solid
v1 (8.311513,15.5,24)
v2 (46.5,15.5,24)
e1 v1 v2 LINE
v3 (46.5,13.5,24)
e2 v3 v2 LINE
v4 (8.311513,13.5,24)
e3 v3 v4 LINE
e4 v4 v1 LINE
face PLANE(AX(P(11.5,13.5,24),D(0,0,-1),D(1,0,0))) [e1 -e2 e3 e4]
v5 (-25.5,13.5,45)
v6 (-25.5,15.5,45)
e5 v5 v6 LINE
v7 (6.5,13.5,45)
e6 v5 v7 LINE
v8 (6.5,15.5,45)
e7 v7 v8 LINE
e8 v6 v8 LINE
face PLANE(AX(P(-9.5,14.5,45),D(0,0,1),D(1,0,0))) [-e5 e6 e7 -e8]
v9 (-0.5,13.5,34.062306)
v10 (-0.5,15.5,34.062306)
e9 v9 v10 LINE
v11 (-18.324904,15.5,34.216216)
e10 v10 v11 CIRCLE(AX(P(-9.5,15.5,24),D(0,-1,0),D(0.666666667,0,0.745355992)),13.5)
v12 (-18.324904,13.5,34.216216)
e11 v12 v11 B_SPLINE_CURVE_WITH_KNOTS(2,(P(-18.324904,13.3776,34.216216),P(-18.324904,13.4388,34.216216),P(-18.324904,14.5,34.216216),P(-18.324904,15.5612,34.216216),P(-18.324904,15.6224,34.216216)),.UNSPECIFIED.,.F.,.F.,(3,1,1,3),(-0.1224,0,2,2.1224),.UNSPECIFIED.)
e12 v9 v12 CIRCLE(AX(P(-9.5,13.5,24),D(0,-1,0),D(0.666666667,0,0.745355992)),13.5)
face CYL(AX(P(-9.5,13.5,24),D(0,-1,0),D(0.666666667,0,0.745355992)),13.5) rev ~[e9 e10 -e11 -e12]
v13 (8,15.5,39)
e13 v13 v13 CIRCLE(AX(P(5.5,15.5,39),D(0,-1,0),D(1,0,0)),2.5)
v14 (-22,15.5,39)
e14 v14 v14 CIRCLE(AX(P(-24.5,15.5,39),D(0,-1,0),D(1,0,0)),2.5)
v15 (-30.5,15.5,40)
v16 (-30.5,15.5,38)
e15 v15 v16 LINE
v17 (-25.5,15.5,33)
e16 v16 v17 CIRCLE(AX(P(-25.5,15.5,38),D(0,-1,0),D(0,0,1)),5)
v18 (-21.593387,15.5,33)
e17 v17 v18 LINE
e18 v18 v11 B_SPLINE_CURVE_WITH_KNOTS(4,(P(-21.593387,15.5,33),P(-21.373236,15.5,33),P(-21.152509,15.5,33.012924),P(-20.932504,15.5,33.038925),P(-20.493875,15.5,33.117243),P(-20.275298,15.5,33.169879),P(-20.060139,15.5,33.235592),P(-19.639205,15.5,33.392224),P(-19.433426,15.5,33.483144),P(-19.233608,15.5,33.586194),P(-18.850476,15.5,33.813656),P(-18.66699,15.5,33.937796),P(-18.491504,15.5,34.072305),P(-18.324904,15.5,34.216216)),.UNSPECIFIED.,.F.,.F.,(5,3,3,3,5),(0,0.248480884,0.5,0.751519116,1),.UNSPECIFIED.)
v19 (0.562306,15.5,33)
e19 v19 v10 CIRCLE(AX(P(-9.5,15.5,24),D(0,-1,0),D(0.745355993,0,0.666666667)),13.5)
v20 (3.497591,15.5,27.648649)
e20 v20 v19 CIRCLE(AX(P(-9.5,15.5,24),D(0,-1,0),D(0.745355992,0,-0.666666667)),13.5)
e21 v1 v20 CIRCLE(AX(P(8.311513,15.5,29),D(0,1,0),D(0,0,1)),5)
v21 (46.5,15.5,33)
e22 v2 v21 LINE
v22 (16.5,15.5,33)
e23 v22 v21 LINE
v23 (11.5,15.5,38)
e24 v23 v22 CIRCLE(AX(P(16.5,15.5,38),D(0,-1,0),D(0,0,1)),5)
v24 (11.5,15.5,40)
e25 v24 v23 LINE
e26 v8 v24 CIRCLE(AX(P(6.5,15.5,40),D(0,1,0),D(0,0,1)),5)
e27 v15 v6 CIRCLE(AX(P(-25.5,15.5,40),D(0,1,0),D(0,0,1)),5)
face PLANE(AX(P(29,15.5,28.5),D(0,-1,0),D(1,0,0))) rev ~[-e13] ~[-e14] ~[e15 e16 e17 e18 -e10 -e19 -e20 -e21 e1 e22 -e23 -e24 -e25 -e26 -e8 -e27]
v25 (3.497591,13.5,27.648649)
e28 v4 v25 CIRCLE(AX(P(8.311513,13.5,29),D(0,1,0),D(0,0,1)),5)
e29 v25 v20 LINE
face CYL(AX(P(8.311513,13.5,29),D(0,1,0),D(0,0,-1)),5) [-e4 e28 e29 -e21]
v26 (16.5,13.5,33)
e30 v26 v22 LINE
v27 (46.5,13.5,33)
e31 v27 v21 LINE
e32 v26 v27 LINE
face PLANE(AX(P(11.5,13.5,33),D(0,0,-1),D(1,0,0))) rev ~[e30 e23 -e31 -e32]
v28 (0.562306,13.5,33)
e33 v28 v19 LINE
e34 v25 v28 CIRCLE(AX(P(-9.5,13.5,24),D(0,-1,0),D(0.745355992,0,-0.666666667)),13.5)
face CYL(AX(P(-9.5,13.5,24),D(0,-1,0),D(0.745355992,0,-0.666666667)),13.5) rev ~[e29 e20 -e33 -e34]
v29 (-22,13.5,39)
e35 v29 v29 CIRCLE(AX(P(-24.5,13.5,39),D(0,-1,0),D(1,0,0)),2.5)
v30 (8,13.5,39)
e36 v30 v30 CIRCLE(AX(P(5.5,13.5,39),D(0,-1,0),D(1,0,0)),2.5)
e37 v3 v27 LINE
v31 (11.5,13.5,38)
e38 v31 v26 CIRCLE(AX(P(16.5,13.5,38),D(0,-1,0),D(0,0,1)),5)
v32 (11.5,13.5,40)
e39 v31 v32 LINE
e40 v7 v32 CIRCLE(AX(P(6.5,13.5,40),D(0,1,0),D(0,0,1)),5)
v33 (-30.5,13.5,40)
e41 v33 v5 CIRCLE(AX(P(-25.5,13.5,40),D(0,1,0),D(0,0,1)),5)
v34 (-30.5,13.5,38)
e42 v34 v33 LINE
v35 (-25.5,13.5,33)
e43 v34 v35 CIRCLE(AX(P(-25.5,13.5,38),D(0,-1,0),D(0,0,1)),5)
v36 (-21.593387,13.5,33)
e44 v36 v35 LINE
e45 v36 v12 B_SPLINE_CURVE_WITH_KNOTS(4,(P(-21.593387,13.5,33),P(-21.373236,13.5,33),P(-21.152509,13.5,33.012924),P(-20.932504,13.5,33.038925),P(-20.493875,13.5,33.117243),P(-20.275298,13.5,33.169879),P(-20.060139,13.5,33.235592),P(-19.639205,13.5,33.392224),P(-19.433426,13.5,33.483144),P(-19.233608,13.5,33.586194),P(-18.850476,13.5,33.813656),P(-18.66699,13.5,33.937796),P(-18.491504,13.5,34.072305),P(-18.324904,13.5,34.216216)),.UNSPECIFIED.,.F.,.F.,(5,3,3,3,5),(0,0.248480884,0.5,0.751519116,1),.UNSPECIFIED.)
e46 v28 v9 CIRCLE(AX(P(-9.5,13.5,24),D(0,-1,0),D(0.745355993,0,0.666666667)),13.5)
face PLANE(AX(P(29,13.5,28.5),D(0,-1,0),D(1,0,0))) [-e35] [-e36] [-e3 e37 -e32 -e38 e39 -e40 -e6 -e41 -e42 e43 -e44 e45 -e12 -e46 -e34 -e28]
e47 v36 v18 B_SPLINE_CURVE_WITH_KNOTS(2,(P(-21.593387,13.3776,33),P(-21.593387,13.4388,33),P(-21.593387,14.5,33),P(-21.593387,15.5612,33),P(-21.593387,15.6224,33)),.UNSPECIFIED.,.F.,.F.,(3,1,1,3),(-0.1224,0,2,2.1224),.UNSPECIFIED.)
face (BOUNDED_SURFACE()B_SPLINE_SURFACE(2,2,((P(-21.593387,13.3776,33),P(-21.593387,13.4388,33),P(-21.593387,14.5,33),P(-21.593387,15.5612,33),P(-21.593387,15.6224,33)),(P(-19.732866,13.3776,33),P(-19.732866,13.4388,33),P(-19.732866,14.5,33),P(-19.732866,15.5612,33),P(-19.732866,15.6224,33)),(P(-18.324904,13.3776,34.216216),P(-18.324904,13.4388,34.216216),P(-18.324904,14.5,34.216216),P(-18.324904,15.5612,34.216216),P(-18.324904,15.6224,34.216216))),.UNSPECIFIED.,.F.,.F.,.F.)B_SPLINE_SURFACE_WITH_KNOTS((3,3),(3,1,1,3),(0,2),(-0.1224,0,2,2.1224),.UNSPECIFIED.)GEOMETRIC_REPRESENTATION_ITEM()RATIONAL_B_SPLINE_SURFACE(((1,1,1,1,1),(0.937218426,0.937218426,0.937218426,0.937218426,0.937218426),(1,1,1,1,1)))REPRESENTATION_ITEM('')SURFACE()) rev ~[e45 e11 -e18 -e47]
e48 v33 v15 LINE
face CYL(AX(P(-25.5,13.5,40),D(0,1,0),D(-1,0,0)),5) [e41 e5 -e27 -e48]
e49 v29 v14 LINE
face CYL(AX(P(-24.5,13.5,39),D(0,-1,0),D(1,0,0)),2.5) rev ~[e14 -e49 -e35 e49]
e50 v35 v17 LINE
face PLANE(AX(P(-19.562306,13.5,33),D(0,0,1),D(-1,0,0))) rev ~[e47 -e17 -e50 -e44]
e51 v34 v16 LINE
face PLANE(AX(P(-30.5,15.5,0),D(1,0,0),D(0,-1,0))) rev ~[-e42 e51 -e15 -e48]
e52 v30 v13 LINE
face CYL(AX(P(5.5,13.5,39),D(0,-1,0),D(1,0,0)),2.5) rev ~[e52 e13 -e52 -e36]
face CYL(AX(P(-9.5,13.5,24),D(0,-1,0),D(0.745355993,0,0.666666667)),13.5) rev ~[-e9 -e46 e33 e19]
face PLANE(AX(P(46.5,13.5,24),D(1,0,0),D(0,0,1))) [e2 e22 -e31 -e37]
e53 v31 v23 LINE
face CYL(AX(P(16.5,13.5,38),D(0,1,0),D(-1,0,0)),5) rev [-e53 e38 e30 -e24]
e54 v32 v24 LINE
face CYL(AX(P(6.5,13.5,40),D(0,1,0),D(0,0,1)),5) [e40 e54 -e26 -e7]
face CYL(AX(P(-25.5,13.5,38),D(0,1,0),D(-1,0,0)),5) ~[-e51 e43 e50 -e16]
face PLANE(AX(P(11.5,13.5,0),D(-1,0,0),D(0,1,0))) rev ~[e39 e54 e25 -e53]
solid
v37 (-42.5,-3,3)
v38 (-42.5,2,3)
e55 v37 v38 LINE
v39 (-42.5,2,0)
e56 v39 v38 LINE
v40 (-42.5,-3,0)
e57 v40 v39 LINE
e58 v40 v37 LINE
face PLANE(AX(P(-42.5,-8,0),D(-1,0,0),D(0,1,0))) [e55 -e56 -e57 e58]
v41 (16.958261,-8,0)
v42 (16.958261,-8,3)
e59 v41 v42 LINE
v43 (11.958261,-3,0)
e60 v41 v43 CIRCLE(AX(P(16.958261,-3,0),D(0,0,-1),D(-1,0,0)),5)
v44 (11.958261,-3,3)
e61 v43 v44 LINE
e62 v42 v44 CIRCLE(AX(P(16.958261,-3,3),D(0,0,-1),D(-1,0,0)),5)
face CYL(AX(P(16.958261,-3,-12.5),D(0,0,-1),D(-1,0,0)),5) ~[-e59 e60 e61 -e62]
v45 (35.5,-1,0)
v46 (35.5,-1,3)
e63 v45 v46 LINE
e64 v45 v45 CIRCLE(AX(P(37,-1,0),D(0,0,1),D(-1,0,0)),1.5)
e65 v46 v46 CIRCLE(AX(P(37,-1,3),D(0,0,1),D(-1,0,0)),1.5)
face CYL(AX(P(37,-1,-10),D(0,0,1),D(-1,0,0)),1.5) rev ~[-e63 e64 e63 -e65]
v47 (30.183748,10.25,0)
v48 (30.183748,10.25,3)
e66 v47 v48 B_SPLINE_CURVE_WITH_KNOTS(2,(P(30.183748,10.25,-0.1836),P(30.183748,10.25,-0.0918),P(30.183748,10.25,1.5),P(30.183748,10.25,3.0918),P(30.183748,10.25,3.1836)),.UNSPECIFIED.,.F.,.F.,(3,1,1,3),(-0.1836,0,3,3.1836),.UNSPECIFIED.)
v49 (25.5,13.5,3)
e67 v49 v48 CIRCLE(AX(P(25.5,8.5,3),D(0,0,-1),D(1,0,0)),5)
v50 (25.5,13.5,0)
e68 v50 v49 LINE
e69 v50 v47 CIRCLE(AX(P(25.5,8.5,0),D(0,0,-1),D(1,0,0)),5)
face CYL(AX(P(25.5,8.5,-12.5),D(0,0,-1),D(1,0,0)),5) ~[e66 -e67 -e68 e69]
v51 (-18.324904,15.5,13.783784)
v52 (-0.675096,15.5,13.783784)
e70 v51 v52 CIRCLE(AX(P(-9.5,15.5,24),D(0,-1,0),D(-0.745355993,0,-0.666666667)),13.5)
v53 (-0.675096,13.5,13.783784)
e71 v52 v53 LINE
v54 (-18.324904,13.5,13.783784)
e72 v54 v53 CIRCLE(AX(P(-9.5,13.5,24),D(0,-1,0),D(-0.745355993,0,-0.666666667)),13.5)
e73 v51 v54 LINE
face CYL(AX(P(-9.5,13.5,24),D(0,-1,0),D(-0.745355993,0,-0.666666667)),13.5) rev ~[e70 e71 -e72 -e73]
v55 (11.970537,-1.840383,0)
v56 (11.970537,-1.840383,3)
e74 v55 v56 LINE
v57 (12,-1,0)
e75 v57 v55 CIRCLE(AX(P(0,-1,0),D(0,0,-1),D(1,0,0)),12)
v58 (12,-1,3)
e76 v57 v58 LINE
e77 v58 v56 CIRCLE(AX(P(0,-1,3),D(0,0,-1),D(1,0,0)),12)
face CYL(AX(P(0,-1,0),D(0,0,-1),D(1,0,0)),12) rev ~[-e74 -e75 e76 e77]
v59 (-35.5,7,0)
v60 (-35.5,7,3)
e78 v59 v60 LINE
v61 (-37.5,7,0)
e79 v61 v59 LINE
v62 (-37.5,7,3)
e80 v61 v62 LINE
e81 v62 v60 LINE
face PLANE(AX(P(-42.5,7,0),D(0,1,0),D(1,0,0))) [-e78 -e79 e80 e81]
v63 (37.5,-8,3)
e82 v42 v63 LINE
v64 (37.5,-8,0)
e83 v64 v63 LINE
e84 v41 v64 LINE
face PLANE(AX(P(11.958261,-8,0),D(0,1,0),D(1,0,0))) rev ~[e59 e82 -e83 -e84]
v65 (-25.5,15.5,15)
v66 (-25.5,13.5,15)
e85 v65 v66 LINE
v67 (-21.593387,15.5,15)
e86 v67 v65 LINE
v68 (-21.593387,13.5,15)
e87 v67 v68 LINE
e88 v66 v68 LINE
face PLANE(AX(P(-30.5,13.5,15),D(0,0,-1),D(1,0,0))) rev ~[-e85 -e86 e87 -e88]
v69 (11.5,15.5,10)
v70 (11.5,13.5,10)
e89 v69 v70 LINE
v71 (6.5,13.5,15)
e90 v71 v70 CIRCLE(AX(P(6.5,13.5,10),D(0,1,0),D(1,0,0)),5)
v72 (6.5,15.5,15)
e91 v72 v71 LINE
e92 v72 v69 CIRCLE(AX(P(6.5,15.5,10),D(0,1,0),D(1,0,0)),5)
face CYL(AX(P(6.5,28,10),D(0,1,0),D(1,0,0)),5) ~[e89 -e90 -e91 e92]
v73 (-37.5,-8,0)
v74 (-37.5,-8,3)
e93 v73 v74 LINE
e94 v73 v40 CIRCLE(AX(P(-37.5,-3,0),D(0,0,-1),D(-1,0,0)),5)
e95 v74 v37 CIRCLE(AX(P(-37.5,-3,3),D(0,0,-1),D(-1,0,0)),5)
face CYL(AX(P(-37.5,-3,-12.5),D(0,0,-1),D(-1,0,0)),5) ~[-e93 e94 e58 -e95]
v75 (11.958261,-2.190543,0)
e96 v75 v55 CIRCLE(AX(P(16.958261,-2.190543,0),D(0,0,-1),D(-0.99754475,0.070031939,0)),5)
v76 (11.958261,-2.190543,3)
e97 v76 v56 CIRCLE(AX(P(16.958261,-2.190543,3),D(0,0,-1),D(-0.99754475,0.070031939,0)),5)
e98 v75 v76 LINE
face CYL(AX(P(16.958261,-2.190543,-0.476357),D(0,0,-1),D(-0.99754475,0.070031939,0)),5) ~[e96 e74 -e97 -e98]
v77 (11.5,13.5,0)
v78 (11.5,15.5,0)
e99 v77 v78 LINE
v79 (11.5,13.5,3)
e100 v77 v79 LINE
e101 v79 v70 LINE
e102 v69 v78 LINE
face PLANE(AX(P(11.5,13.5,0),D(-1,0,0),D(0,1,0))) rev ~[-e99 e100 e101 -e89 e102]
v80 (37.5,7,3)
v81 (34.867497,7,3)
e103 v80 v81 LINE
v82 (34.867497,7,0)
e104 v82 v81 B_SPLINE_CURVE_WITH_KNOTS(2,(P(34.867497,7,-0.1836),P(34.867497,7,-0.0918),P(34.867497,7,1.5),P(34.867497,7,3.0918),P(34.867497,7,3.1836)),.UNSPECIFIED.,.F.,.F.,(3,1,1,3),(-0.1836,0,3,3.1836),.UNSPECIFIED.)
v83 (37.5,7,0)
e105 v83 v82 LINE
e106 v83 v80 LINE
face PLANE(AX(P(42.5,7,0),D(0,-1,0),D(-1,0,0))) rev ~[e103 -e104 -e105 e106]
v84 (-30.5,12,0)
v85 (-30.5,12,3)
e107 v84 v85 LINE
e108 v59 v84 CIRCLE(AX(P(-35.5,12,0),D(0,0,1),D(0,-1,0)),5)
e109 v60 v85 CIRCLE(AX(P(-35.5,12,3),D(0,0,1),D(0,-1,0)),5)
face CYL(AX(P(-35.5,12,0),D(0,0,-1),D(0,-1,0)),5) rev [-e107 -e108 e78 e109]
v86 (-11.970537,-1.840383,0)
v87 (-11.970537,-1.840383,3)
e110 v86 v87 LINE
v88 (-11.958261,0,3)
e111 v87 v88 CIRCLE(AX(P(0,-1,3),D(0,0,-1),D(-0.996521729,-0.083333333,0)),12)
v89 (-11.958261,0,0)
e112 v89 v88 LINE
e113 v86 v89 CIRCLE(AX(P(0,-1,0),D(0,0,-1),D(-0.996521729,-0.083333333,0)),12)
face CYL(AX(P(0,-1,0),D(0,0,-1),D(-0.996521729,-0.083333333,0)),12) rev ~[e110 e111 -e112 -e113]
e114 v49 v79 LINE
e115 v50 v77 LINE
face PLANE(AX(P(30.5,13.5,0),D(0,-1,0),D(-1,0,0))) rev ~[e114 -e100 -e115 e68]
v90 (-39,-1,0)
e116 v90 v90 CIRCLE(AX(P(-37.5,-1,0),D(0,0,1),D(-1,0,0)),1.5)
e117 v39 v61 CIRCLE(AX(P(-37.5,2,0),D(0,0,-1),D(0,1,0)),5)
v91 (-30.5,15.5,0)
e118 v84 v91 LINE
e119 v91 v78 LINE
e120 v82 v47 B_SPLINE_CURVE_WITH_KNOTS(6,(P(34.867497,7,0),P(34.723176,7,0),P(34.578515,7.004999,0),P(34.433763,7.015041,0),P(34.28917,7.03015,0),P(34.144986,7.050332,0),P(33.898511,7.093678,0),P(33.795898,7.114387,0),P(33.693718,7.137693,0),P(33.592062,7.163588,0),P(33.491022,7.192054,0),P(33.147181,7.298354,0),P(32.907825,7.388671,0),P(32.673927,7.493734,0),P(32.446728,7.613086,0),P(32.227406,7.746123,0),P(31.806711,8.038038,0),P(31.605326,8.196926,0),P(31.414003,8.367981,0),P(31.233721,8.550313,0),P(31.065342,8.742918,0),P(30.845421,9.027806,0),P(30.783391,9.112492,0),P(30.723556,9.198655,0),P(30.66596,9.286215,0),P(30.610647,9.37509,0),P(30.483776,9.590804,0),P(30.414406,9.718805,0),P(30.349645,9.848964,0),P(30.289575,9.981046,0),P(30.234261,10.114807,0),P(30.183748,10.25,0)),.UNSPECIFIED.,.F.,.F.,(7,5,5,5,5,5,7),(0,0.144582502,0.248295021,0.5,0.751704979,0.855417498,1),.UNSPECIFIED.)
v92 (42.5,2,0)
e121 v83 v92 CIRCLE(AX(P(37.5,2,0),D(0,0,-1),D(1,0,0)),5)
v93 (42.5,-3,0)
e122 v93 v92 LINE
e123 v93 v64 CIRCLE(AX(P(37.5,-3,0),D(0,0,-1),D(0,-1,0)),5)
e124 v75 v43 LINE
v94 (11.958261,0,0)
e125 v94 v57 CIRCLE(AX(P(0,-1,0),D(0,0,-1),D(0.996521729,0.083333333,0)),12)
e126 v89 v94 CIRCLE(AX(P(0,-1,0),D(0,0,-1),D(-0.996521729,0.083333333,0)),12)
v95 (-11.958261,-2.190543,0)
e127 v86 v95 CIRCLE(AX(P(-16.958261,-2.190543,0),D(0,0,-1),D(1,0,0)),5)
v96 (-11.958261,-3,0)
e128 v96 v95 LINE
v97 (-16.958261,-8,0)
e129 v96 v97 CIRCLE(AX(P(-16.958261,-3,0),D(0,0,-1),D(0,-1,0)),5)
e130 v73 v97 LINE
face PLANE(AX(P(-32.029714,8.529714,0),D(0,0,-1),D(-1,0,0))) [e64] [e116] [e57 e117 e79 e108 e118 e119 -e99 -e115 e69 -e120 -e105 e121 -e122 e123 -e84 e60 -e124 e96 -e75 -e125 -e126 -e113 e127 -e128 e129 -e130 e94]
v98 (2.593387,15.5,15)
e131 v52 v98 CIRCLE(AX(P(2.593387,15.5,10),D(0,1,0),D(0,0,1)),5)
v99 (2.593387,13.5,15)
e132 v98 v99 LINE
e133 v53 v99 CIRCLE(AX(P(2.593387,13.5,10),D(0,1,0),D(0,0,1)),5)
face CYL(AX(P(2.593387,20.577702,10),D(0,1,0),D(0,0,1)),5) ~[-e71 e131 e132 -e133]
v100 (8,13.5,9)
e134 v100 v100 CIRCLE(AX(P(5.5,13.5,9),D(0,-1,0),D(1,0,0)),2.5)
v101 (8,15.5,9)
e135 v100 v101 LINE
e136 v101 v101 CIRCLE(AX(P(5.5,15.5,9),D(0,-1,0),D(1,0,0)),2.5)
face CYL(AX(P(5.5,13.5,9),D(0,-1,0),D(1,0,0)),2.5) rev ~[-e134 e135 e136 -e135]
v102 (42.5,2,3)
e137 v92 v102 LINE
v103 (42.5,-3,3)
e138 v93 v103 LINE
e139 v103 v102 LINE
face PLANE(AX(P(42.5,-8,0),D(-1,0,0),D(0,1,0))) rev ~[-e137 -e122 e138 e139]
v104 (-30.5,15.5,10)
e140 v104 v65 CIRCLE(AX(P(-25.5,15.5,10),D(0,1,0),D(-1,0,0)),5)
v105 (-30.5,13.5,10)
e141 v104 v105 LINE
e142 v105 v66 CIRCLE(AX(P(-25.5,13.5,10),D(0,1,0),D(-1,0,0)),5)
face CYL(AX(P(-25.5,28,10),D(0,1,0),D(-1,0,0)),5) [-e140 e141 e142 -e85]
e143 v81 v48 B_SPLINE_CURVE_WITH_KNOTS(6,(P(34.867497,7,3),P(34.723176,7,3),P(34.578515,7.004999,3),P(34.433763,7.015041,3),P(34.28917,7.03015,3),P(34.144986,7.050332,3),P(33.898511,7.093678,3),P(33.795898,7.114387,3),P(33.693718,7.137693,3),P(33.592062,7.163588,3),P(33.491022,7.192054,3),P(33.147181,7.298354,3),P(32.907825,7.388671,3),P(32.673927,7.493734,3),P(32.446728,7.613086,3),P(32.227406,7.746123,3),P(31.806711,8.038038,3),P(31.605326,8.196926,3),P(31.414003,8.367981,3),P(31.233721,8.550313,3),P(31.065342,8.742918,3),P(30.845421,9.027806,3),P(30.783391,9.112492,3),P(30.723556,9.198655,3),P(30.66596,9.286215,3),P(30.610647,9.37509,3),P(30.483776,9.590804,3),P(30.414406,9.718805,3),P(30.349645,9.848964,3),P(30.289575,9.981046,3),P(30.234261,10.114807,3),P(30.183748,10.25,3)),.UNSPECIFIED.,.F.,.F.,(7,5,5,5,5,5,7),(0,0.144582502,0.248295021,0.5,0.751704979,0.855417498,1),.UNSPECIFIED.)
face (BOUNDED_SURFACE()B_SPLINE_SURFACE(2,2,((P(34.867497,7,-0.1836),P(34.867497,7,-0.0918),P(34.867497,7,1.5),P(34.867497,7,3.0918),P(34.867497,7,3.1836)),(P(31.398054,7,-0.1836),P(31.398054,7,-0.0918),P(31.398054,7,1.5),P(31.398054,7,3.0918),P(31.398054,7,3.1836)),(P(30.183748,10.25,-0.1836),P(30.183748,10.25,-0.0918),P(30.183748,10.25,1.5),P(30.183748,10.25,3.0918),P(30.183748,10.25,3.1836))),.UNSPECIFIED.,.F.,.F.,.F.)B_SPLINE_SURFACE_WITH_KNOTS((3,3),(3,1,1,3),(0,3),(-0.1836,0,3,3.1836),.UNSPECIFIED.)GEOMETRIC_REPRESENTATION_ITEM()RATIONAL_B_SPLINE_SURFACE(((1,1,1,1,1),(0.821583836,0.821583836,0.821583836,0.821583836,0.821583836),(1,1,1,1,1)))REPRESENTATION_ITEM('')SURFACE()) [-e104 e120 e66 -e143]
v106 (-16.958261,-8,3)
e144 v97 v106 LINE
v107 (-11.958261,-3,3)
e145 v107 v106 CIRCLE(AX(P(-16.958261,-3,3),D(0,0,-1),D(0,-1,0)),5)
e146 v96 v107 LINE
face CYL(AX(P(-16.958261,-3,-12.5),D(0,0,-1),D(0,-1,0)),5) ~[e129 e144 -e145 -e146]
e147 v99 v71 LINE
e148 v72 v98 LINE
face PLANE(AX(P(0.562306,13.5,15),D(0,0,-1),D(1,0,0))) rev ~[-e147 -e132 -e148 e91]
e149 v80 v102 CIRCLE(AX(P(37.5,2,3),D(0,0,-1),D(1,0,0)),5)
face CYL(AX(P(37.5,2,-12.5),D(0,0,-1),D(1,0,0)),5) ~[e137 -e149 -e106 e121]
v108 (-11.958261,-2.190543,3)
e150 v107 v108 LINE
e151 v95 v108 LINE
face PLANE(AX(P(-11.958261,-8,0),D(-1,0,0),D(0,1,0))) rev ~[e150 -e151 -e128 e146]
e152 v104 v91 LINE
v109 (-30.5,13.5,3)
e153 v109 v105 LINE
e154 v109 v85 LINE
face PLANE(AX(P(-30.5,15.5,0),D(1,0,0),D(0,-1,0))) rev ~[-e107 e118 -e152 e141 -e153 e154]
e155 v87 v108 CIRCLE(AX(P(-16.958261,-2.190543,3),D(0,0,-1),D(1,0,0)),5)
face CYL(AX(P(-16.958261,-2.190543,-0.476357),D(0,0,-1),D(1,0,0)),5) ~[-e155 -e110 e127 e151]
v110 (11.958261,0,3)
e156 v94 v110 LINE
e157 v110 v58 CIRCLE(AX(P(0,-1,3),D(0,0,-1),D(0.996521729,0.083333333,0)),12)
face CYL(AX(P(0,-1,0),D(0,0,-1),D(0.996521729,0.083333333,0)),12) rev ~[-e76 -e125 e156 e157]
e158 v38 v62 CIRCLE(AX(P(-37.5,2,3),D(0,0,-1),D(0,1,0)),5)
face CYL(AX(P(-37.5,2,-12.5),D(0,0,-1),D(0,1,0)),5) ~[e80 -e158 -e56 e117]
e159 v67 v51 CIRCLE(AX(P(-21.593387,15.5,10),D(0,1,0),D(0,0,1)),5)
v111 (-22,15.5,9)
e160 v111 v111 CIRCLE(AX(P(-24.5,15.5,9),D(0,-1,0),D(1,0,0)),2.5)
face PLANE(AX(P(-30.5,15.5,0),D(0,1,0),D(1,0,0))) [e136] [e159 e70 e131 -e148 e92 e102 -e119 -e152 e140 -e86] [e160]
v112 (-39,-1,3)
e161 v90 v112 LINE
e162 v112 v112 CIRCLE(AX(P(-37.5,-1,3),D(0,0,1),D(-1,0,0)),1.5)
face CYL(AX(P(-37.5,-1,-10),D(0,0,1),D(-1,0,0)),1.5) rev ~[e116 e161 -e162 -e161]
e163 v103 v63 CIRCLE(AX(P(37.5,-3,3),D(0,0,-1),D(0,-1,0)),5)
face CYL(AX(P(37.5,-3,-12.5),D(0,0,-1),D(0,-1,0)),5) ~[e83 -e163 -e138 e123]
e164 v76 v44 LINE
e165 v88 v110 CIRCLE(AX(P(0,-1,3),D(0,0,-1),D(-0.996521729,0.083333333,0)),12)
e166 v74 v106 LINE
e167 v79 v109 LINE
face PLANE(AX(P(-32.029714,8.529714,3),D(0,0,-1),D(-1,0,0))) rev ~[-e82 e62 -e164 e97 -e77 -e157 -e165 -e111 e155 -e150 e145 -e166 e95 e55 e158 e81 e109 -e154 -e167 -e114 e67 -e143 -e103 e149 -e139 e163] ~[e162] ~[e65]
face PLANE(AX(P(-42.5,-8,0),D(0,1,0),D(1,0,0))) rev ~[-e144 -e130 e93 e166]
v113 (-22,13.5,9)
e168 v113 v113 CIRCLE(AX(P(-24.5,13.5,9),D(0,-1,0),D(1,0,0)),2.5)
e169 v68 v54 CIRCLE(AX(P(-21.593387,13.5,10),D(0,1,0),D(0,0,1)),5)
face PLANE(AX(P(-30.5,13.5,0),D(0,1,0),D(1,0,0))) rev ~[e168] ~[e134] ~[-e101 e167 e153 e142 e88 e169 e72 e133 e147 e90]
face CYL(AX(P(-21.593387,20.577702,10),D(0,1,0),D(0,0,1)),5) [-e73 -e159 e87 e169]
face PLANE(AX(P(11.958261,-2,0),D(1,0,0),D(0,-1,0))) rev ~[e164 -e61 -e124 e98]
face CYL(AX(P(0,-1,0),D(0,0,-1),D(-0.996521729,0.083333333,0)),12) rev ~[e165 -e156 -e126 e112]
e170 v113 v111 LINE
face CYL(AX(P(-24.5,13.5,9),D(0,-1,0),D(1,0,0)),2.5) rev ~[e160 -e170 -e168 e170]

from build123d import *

# Parameters (mm, degrees)
F0_W        = 12
F0_H        = 15
F0_W_2      = 42
F0_H_2      = 2
F0_W_3      = 17
F0_H_3      = 6.5
F1_DEPTH    = 3
F2_D        = 3
F2_DEPTH    = 10
F2_TIP      = 0.9012909285
F3_DEPTH    = 45
F4_R        = 2.5
F5_DEPTH    = 25
F6_T1_DEPTH = 3
F6_T3_DEPTH = 28
F6_T5_DEPTH = 27
F6_T7_DEPTH = 12.1554036185
F6_T9_DEPTH = 3.9527148617
F6_S1_F1_R  = 5
F6_S1_F2_R  = 5
F6_S1_F3_R  = 5
F6_S1_F4_R  = 5
F6_S1_F5_R  = 5
F7_R        = 5
F4_W        = 35
F4_H        = 9
F8_DEPTH    = 2
F9_R        = 5


# Not quite as in the source:
# - a fillet or chamfer that OpenCascade refuses, or shapes differently, is made with other operations: its cross-section is extruded or revolved along the edge and cut away or added


with BuildPart() as f1:
    # F0 (on Top) → F1 (new body)
    with BuildSketch(Plane.XY):
        with Locations((-36.5, -0.5)):
            Rectangle(F0_W, F0_H)
        with Locations((36.5, -0.5)):
            Rectangle(F0_W, F0_H)
        with Locations((-9.5, 14.5)):
            Rectangle(F0_W_2, F0_H_2)
        with BuildLine():
            Line((-30.5, 13.5), (-30.5, 7))
            Line((-30.5, 7), (-30.5, -8))
            Line((-30.5, -8), (-11.9582607431, -8))
            Line((-11.9582607431, -8), (-11.9582607431, -2))
            ThreePointArc((-11.9582607431, -2), (-12, -1), (-11.9582607431, 0))
            ThreePointArc((-11.9582607431, 0), (0, 11), (11.9582607431, 0))
            ThreePointArc((11.9582607431, 0), (11.9895606449, -0.4995646481), (12, -1))
            ThreePointArc((12, -1), (11.9895606449, -1.5004353519), (11.9582607431, -2))
            Line((11.9582607431, -2), (11.9582607431, -8))
            Line((11.9582607431, -8), (30.5, -8))
            Line((30.5, -8), (30.5, 7))
            Line((30.5, 7), (13.5, 7))
            Line((13.5, 7), (13.5, 13.5))
            Line((13.5, 13.5), (11.5, 13.5))
            Line((11.5, 13.5), (-30.5, 13.5))
        make_face()
        with Locations((22, 10.25)):
            Rectangle(F0_W_3, F0_H_3)
    extrude(amount=F1_DEPTH)

    # F2
    with Locations(Plane(origin=(0, 0, 0), x_dir=(1, 0, 0), z_dir=(0, 0, -1))):
        with Locations((-37.5, 1), (37, 1)):
            Hole(F2_D / 2, depth=F2_DEPTH)
            with Locations((0, 0, -(F2_DEPTH + F2_TIP / 2))):  # 118° drill point
                Cone(0, F2_D / 2, F2_TIP, mode=Mode.SUBTRACT)

    # F0 (on Top) → F3 (join)
    with BuildSketch(Plane.XY):
        with Locations((-9.5, 14.5)):
            Rectangle(F0_W_2, F0_H_2)
    extrude(amount=F3_DEPTH)

    # F4 (on face) → F5 (cut)
    with BuildSketch(Plane.XZ.offset(-13.5)):
        with Locations((-24.5, 39)):
            Circle(F4_R)
        with Locations((5.5, 39)):
            Circle(F4_R)
        with Locations((-24.5, 9)):
            Circle(F4_R)
        with Locations((5.5, 9)):
            Circle(F4_R)
        with BuildLine():
            ThreePointArc((0.5623058987, 15), (3.111326846, 19.1829017881), (4, 24))
            ThreePointArc((4, 24), (3.111326846, 28.8170982119), (0.5623058987, 33))
            ThreePointArc((0.5623058987, 33), (0.045941546, 33.545941546), (-0.5, 34.0623058987))
            ThreePointArc((-0.5, 34.0623058987), (-9.5, 37.5), (-18.5, 34.0623058987))
            ThreePointArc((-18.5, 34.0623058987), (-19.045941546, 33.545941546), (-19.5623058987, 33))
            ThreePointArc((-19.5623058987, 33), (-22.111326846, 28.8170982119), (-23, 24))
            ThreePointArc((-23, 24), (-22.111326846, 19.1829017881), (-19.5623058987, 15))
            ThreePointArc((-19.5623058987, 15), (-9.5, 10.5), (0.5623058987, 15))
        make_face()
        with BuildLine():
            Line((-30.5, 15), (-19.5623058987, 15))
            ThreePointArc((-19.5623058987, 15), (-22.111326846, 19.1829017881), (-23, 24))
            Line((-23, 24), (-30.5, 24))
            Line((-30.5, 24), (-30.5, 15))
        make_face()
        with BuildLine():
            Line((11.5, 24), (4, 24))
            ThreePointArc((4, 24), (3.111326846, 19.1829017881), (0.5623058987, 15))
            Line((0.5623058987, 15), (11.5, 15))
            Line((11.5, 15), (11.5, 24))
        make_face()
        with BuildLine():
            Line((-30.5, 24), (-23, 24))
            ThreePointArc((-23, 24), (-22.111326846, 28.8170982119), (-19.5623058987, 33))
            Line((-19.5623058987, 33), (-30.5, 33))
            Line((-30.5, 33), (-30.5, 24))
        make_face()
    extrude(amount=-F5_DEPTH, mode=Mode.SUBTRACT)

    # F6: fillet of radius 5 on 14 edges, made by hand

    # F6_s2 → F6_t1 (join)
    with BuildSketch(Plane.XY):
        with BuildLine():
            ThreePointArc((-35.5, 7), (-31.9644660941, 8.4644660941), (-30.5, 12))
            Line((-30.5, 12), (-30.5, 7))
            Line((-30.5, 7), (-35.5, 7))
        make_face()
    extrude(amount=F6_T1_DEPTH)

    # F6_s4 → F6_t3 (cut)
    with BuildSketch(Plane.XY.offset(-12.5)):
        with BuildLine():
            ThreePointArc((-42.5, -3), (-41.0355339059, -6.5355339059), (-37.5, -8))
            Line((-37.5, -8), (-42.5, -8))
            Line((-42.5, -8), (-42.5, -3))
        make_face()
        with BuildLine():
            ThreePointArc((-37.5, 7), (-41.0355339059, 5.5355339059), (-42.5, 2))
            Line((-42.5, 2), (-42.5, 7))
            Line((-42.5, 7), (-37.5, 7))
        make_face()
        with BuildLine():
            ThreePointArc((42.5, 2), (41.0355339059, 5.5355339059), (37.5, 7))
            Line((37.5, 7), (42.5, 7))
            Line((42.5, 7), (42.5, 2))
        make_face()
        with BuildLine():
            ThreePointArc((37.5, -8), (41.0355339059, -6.5355339059), (42.5, -3))
            Line((42.5, -3), (42.5, -8))
            Line((42.5, -8), (37.5, -8))
        make_face()
        with BuildLine():
            ThreePointArc((30.5, 8.5), (29.0355339059, 12.0355339059), (25.5, 13.5))
            Line((25.5, 13.5), (30.5, 13.5))
            Line((30.5, 13.5), (30.5, 8.5))
        make_face()
        with BuildLine():
            ThreePointArc((-16.9582607431, -8), (-13.4227268372, -6.5355339059), (-11.9582607431, -3))
            Line((-11.9582607431, -3), (-11.9582607431, -8))
            Line((-11.9582607431, -8), (-16.9582607431, -8))
        make_face()
        with BuildLine():
            ThreePointArc((11.9582607431, -3), (13.4227268372, -6.5355339059), (16.9582607431, -8))
            Line((16.9582607431, -8), (11.9582607431, -8))
            Line((11.9582607431, -8), (11.9582607431, -3))
        make_face()
    extrude(amount=F6_T3_DEPTH, mode=Mode.SUBTRACT)

    # F6_s6 → F6_t5 (cut)
    with BuildSketch(Plane.XZ.offset(-28)):
        with BuildLine():
            ThreePointArc((-30.5, 10), (-29.0355339059, 13.5355339059), (-25.5, 15))
            Line((-25.5, 15), (-30.5, 15))
            Line((-30.5, 15), (-30.5, 10))
        make_face()
        with BuildLine():
            ThreePointArc((11.5, 10), (10.0355339059, 13.5355339059), (6.5, 15))
            Line((6.5, 15), (11.5, 15))
            Line((11.5, 15), (11.5, 10))
        make_face()
    extrude(amount=F6_T5_DEPTH, mode=Mode.SUBTRACT)

    # F6_s8 → F6_t7 (cut)
    with BuildSketch(Plane.XZ.offset(-20.5777018093)):
        with BuildLine():
            ThreePointArc((-21.5933866224, 15), (-19.8496720413, 14.6860921309), (-18.3249037515, 13.7837837838))
            ThreePointArc((-18.3249037515, 13.7837837838), (-18.9631637186, 14.3719922915), (-19.5623058987, 15))
            Line((-19.5623058987, 15), (-21.5933866224, 15))
        make_face()
        with BuildLine():
            ThreePointArc((2.5933866224, 15), (0.8496720413, 14.6860921309), (-0.6750962485, 13.7837837838))
            ThreePointArc((-0.6750962485, 13.7837837838), (-0.0368362814, 14.3719922915), (0.5623058987, 15))
            Line((0.5623058987, 15), (2.5933866224, 15))
        make_face()
    extrude(amount=F6_T7_DEPTH, mode=Mode.SUBTRACT)

    # F6_s10 → F6_t9 (cut)
    with BuildSketch(Plane.XY.offset(-0.4763574308)):
        with BuildLine():
            ThreePointArc((-11.9582607431, -2.1905429723), (-11.9613307486, -2.0153555582), (-11.9705369951, -1.8403832746))
            ThreePointArc((-11.9705369951, -1.8403832746), (-11.9646650465, -1.9202121092), (-11.9582607431, -2))
            Line((-11.9582607431, -2), (-11.9582607431, -2.1905429723))
        make_face()
        with BuildLine():
            ThreePointArc((11.9705369951, -1.8403832746), (11.9613307486, -2.0153555582), (11.9582607431, -2.1905429723))
            Line((11.9582607431, -2.1905429723), (11.9582607431, -2))
            ThreePointArc((11.9582607431, -2), (11.9646650465, -1.9202121092), (11.9705369951, -1.8403832746))
        make_face()
    extrude(amount=F6_T9_DEPTH, mode=Mode.SUBTRACT)

    # F6#s1: fillet of radius 5 on 5 edges, made by hand

    # F6_s1_f1
    f6_s1_f1_edges = [f1.edges().sort_by_distance(p)[0] for p in [
        (-30.5, 14.5, 33),
    ]]
    fillet(f6_s1_f1_edges, radius=F6_S1_F1_R)

    # F6_s1_f2
    f6_s1_f2_edges = [f1.edges().sort_by_distance(p)[0] for p in [
        (-30.5, 14.5, 45),
    ]]
    fillet(f6_s1_f2_edges, radius=F6_S1_F2_R)

    # F6_s1_f3
    f6_s1_f3_edges = [f1.edges().sort_by_distance(p)[0] for p in [
        (-19.5623058987, 14.5, 33),
    ]]
    fillet(f6_s1_f3_edges, radius=F6_S1_F3_R)

    # F6_s1_f4
    f6_s1_f4_edges = [f1.edges().sort_by_distance(p)[0] for p in [
        (11.5, 14.5, 45),
    ]]
    fillet(f6_s1_f4_edges, radius=F6_S1_F4_R)

    # F6_s1_f5
    f6_s1_f5_edges = [f1.edges().sort_by_distance(p)[0] for p in [
        (4, 14.5, 24),
    ]]
    fillet(f6_s1_f5_edges, radius=F6_S1_F5_R)

    # F7
    f7_edges = [f1.edges().sort_by_distance(p)[0] for p in [
        (30.5, 7, 1.5),
    ]]
    fillet(f7_edges, radius=F7_R)

    # F4 (on face) → F8 (join)
    with BuildSketch(Plane.XZ.offset(-13.5)):
        with Locations((29, 28.5)):
            Rectangle(F4_W, F4_H)
    extrude(amount=-F8_DEPTH)

    # F9
    f9_edges = [f1.edges().sort_by_distance(p)[0] for p in [
        (11.5, 14.5, 33),
    ]]
    fillet(f9_edges, radius=F9_R)


solid = f1.part
